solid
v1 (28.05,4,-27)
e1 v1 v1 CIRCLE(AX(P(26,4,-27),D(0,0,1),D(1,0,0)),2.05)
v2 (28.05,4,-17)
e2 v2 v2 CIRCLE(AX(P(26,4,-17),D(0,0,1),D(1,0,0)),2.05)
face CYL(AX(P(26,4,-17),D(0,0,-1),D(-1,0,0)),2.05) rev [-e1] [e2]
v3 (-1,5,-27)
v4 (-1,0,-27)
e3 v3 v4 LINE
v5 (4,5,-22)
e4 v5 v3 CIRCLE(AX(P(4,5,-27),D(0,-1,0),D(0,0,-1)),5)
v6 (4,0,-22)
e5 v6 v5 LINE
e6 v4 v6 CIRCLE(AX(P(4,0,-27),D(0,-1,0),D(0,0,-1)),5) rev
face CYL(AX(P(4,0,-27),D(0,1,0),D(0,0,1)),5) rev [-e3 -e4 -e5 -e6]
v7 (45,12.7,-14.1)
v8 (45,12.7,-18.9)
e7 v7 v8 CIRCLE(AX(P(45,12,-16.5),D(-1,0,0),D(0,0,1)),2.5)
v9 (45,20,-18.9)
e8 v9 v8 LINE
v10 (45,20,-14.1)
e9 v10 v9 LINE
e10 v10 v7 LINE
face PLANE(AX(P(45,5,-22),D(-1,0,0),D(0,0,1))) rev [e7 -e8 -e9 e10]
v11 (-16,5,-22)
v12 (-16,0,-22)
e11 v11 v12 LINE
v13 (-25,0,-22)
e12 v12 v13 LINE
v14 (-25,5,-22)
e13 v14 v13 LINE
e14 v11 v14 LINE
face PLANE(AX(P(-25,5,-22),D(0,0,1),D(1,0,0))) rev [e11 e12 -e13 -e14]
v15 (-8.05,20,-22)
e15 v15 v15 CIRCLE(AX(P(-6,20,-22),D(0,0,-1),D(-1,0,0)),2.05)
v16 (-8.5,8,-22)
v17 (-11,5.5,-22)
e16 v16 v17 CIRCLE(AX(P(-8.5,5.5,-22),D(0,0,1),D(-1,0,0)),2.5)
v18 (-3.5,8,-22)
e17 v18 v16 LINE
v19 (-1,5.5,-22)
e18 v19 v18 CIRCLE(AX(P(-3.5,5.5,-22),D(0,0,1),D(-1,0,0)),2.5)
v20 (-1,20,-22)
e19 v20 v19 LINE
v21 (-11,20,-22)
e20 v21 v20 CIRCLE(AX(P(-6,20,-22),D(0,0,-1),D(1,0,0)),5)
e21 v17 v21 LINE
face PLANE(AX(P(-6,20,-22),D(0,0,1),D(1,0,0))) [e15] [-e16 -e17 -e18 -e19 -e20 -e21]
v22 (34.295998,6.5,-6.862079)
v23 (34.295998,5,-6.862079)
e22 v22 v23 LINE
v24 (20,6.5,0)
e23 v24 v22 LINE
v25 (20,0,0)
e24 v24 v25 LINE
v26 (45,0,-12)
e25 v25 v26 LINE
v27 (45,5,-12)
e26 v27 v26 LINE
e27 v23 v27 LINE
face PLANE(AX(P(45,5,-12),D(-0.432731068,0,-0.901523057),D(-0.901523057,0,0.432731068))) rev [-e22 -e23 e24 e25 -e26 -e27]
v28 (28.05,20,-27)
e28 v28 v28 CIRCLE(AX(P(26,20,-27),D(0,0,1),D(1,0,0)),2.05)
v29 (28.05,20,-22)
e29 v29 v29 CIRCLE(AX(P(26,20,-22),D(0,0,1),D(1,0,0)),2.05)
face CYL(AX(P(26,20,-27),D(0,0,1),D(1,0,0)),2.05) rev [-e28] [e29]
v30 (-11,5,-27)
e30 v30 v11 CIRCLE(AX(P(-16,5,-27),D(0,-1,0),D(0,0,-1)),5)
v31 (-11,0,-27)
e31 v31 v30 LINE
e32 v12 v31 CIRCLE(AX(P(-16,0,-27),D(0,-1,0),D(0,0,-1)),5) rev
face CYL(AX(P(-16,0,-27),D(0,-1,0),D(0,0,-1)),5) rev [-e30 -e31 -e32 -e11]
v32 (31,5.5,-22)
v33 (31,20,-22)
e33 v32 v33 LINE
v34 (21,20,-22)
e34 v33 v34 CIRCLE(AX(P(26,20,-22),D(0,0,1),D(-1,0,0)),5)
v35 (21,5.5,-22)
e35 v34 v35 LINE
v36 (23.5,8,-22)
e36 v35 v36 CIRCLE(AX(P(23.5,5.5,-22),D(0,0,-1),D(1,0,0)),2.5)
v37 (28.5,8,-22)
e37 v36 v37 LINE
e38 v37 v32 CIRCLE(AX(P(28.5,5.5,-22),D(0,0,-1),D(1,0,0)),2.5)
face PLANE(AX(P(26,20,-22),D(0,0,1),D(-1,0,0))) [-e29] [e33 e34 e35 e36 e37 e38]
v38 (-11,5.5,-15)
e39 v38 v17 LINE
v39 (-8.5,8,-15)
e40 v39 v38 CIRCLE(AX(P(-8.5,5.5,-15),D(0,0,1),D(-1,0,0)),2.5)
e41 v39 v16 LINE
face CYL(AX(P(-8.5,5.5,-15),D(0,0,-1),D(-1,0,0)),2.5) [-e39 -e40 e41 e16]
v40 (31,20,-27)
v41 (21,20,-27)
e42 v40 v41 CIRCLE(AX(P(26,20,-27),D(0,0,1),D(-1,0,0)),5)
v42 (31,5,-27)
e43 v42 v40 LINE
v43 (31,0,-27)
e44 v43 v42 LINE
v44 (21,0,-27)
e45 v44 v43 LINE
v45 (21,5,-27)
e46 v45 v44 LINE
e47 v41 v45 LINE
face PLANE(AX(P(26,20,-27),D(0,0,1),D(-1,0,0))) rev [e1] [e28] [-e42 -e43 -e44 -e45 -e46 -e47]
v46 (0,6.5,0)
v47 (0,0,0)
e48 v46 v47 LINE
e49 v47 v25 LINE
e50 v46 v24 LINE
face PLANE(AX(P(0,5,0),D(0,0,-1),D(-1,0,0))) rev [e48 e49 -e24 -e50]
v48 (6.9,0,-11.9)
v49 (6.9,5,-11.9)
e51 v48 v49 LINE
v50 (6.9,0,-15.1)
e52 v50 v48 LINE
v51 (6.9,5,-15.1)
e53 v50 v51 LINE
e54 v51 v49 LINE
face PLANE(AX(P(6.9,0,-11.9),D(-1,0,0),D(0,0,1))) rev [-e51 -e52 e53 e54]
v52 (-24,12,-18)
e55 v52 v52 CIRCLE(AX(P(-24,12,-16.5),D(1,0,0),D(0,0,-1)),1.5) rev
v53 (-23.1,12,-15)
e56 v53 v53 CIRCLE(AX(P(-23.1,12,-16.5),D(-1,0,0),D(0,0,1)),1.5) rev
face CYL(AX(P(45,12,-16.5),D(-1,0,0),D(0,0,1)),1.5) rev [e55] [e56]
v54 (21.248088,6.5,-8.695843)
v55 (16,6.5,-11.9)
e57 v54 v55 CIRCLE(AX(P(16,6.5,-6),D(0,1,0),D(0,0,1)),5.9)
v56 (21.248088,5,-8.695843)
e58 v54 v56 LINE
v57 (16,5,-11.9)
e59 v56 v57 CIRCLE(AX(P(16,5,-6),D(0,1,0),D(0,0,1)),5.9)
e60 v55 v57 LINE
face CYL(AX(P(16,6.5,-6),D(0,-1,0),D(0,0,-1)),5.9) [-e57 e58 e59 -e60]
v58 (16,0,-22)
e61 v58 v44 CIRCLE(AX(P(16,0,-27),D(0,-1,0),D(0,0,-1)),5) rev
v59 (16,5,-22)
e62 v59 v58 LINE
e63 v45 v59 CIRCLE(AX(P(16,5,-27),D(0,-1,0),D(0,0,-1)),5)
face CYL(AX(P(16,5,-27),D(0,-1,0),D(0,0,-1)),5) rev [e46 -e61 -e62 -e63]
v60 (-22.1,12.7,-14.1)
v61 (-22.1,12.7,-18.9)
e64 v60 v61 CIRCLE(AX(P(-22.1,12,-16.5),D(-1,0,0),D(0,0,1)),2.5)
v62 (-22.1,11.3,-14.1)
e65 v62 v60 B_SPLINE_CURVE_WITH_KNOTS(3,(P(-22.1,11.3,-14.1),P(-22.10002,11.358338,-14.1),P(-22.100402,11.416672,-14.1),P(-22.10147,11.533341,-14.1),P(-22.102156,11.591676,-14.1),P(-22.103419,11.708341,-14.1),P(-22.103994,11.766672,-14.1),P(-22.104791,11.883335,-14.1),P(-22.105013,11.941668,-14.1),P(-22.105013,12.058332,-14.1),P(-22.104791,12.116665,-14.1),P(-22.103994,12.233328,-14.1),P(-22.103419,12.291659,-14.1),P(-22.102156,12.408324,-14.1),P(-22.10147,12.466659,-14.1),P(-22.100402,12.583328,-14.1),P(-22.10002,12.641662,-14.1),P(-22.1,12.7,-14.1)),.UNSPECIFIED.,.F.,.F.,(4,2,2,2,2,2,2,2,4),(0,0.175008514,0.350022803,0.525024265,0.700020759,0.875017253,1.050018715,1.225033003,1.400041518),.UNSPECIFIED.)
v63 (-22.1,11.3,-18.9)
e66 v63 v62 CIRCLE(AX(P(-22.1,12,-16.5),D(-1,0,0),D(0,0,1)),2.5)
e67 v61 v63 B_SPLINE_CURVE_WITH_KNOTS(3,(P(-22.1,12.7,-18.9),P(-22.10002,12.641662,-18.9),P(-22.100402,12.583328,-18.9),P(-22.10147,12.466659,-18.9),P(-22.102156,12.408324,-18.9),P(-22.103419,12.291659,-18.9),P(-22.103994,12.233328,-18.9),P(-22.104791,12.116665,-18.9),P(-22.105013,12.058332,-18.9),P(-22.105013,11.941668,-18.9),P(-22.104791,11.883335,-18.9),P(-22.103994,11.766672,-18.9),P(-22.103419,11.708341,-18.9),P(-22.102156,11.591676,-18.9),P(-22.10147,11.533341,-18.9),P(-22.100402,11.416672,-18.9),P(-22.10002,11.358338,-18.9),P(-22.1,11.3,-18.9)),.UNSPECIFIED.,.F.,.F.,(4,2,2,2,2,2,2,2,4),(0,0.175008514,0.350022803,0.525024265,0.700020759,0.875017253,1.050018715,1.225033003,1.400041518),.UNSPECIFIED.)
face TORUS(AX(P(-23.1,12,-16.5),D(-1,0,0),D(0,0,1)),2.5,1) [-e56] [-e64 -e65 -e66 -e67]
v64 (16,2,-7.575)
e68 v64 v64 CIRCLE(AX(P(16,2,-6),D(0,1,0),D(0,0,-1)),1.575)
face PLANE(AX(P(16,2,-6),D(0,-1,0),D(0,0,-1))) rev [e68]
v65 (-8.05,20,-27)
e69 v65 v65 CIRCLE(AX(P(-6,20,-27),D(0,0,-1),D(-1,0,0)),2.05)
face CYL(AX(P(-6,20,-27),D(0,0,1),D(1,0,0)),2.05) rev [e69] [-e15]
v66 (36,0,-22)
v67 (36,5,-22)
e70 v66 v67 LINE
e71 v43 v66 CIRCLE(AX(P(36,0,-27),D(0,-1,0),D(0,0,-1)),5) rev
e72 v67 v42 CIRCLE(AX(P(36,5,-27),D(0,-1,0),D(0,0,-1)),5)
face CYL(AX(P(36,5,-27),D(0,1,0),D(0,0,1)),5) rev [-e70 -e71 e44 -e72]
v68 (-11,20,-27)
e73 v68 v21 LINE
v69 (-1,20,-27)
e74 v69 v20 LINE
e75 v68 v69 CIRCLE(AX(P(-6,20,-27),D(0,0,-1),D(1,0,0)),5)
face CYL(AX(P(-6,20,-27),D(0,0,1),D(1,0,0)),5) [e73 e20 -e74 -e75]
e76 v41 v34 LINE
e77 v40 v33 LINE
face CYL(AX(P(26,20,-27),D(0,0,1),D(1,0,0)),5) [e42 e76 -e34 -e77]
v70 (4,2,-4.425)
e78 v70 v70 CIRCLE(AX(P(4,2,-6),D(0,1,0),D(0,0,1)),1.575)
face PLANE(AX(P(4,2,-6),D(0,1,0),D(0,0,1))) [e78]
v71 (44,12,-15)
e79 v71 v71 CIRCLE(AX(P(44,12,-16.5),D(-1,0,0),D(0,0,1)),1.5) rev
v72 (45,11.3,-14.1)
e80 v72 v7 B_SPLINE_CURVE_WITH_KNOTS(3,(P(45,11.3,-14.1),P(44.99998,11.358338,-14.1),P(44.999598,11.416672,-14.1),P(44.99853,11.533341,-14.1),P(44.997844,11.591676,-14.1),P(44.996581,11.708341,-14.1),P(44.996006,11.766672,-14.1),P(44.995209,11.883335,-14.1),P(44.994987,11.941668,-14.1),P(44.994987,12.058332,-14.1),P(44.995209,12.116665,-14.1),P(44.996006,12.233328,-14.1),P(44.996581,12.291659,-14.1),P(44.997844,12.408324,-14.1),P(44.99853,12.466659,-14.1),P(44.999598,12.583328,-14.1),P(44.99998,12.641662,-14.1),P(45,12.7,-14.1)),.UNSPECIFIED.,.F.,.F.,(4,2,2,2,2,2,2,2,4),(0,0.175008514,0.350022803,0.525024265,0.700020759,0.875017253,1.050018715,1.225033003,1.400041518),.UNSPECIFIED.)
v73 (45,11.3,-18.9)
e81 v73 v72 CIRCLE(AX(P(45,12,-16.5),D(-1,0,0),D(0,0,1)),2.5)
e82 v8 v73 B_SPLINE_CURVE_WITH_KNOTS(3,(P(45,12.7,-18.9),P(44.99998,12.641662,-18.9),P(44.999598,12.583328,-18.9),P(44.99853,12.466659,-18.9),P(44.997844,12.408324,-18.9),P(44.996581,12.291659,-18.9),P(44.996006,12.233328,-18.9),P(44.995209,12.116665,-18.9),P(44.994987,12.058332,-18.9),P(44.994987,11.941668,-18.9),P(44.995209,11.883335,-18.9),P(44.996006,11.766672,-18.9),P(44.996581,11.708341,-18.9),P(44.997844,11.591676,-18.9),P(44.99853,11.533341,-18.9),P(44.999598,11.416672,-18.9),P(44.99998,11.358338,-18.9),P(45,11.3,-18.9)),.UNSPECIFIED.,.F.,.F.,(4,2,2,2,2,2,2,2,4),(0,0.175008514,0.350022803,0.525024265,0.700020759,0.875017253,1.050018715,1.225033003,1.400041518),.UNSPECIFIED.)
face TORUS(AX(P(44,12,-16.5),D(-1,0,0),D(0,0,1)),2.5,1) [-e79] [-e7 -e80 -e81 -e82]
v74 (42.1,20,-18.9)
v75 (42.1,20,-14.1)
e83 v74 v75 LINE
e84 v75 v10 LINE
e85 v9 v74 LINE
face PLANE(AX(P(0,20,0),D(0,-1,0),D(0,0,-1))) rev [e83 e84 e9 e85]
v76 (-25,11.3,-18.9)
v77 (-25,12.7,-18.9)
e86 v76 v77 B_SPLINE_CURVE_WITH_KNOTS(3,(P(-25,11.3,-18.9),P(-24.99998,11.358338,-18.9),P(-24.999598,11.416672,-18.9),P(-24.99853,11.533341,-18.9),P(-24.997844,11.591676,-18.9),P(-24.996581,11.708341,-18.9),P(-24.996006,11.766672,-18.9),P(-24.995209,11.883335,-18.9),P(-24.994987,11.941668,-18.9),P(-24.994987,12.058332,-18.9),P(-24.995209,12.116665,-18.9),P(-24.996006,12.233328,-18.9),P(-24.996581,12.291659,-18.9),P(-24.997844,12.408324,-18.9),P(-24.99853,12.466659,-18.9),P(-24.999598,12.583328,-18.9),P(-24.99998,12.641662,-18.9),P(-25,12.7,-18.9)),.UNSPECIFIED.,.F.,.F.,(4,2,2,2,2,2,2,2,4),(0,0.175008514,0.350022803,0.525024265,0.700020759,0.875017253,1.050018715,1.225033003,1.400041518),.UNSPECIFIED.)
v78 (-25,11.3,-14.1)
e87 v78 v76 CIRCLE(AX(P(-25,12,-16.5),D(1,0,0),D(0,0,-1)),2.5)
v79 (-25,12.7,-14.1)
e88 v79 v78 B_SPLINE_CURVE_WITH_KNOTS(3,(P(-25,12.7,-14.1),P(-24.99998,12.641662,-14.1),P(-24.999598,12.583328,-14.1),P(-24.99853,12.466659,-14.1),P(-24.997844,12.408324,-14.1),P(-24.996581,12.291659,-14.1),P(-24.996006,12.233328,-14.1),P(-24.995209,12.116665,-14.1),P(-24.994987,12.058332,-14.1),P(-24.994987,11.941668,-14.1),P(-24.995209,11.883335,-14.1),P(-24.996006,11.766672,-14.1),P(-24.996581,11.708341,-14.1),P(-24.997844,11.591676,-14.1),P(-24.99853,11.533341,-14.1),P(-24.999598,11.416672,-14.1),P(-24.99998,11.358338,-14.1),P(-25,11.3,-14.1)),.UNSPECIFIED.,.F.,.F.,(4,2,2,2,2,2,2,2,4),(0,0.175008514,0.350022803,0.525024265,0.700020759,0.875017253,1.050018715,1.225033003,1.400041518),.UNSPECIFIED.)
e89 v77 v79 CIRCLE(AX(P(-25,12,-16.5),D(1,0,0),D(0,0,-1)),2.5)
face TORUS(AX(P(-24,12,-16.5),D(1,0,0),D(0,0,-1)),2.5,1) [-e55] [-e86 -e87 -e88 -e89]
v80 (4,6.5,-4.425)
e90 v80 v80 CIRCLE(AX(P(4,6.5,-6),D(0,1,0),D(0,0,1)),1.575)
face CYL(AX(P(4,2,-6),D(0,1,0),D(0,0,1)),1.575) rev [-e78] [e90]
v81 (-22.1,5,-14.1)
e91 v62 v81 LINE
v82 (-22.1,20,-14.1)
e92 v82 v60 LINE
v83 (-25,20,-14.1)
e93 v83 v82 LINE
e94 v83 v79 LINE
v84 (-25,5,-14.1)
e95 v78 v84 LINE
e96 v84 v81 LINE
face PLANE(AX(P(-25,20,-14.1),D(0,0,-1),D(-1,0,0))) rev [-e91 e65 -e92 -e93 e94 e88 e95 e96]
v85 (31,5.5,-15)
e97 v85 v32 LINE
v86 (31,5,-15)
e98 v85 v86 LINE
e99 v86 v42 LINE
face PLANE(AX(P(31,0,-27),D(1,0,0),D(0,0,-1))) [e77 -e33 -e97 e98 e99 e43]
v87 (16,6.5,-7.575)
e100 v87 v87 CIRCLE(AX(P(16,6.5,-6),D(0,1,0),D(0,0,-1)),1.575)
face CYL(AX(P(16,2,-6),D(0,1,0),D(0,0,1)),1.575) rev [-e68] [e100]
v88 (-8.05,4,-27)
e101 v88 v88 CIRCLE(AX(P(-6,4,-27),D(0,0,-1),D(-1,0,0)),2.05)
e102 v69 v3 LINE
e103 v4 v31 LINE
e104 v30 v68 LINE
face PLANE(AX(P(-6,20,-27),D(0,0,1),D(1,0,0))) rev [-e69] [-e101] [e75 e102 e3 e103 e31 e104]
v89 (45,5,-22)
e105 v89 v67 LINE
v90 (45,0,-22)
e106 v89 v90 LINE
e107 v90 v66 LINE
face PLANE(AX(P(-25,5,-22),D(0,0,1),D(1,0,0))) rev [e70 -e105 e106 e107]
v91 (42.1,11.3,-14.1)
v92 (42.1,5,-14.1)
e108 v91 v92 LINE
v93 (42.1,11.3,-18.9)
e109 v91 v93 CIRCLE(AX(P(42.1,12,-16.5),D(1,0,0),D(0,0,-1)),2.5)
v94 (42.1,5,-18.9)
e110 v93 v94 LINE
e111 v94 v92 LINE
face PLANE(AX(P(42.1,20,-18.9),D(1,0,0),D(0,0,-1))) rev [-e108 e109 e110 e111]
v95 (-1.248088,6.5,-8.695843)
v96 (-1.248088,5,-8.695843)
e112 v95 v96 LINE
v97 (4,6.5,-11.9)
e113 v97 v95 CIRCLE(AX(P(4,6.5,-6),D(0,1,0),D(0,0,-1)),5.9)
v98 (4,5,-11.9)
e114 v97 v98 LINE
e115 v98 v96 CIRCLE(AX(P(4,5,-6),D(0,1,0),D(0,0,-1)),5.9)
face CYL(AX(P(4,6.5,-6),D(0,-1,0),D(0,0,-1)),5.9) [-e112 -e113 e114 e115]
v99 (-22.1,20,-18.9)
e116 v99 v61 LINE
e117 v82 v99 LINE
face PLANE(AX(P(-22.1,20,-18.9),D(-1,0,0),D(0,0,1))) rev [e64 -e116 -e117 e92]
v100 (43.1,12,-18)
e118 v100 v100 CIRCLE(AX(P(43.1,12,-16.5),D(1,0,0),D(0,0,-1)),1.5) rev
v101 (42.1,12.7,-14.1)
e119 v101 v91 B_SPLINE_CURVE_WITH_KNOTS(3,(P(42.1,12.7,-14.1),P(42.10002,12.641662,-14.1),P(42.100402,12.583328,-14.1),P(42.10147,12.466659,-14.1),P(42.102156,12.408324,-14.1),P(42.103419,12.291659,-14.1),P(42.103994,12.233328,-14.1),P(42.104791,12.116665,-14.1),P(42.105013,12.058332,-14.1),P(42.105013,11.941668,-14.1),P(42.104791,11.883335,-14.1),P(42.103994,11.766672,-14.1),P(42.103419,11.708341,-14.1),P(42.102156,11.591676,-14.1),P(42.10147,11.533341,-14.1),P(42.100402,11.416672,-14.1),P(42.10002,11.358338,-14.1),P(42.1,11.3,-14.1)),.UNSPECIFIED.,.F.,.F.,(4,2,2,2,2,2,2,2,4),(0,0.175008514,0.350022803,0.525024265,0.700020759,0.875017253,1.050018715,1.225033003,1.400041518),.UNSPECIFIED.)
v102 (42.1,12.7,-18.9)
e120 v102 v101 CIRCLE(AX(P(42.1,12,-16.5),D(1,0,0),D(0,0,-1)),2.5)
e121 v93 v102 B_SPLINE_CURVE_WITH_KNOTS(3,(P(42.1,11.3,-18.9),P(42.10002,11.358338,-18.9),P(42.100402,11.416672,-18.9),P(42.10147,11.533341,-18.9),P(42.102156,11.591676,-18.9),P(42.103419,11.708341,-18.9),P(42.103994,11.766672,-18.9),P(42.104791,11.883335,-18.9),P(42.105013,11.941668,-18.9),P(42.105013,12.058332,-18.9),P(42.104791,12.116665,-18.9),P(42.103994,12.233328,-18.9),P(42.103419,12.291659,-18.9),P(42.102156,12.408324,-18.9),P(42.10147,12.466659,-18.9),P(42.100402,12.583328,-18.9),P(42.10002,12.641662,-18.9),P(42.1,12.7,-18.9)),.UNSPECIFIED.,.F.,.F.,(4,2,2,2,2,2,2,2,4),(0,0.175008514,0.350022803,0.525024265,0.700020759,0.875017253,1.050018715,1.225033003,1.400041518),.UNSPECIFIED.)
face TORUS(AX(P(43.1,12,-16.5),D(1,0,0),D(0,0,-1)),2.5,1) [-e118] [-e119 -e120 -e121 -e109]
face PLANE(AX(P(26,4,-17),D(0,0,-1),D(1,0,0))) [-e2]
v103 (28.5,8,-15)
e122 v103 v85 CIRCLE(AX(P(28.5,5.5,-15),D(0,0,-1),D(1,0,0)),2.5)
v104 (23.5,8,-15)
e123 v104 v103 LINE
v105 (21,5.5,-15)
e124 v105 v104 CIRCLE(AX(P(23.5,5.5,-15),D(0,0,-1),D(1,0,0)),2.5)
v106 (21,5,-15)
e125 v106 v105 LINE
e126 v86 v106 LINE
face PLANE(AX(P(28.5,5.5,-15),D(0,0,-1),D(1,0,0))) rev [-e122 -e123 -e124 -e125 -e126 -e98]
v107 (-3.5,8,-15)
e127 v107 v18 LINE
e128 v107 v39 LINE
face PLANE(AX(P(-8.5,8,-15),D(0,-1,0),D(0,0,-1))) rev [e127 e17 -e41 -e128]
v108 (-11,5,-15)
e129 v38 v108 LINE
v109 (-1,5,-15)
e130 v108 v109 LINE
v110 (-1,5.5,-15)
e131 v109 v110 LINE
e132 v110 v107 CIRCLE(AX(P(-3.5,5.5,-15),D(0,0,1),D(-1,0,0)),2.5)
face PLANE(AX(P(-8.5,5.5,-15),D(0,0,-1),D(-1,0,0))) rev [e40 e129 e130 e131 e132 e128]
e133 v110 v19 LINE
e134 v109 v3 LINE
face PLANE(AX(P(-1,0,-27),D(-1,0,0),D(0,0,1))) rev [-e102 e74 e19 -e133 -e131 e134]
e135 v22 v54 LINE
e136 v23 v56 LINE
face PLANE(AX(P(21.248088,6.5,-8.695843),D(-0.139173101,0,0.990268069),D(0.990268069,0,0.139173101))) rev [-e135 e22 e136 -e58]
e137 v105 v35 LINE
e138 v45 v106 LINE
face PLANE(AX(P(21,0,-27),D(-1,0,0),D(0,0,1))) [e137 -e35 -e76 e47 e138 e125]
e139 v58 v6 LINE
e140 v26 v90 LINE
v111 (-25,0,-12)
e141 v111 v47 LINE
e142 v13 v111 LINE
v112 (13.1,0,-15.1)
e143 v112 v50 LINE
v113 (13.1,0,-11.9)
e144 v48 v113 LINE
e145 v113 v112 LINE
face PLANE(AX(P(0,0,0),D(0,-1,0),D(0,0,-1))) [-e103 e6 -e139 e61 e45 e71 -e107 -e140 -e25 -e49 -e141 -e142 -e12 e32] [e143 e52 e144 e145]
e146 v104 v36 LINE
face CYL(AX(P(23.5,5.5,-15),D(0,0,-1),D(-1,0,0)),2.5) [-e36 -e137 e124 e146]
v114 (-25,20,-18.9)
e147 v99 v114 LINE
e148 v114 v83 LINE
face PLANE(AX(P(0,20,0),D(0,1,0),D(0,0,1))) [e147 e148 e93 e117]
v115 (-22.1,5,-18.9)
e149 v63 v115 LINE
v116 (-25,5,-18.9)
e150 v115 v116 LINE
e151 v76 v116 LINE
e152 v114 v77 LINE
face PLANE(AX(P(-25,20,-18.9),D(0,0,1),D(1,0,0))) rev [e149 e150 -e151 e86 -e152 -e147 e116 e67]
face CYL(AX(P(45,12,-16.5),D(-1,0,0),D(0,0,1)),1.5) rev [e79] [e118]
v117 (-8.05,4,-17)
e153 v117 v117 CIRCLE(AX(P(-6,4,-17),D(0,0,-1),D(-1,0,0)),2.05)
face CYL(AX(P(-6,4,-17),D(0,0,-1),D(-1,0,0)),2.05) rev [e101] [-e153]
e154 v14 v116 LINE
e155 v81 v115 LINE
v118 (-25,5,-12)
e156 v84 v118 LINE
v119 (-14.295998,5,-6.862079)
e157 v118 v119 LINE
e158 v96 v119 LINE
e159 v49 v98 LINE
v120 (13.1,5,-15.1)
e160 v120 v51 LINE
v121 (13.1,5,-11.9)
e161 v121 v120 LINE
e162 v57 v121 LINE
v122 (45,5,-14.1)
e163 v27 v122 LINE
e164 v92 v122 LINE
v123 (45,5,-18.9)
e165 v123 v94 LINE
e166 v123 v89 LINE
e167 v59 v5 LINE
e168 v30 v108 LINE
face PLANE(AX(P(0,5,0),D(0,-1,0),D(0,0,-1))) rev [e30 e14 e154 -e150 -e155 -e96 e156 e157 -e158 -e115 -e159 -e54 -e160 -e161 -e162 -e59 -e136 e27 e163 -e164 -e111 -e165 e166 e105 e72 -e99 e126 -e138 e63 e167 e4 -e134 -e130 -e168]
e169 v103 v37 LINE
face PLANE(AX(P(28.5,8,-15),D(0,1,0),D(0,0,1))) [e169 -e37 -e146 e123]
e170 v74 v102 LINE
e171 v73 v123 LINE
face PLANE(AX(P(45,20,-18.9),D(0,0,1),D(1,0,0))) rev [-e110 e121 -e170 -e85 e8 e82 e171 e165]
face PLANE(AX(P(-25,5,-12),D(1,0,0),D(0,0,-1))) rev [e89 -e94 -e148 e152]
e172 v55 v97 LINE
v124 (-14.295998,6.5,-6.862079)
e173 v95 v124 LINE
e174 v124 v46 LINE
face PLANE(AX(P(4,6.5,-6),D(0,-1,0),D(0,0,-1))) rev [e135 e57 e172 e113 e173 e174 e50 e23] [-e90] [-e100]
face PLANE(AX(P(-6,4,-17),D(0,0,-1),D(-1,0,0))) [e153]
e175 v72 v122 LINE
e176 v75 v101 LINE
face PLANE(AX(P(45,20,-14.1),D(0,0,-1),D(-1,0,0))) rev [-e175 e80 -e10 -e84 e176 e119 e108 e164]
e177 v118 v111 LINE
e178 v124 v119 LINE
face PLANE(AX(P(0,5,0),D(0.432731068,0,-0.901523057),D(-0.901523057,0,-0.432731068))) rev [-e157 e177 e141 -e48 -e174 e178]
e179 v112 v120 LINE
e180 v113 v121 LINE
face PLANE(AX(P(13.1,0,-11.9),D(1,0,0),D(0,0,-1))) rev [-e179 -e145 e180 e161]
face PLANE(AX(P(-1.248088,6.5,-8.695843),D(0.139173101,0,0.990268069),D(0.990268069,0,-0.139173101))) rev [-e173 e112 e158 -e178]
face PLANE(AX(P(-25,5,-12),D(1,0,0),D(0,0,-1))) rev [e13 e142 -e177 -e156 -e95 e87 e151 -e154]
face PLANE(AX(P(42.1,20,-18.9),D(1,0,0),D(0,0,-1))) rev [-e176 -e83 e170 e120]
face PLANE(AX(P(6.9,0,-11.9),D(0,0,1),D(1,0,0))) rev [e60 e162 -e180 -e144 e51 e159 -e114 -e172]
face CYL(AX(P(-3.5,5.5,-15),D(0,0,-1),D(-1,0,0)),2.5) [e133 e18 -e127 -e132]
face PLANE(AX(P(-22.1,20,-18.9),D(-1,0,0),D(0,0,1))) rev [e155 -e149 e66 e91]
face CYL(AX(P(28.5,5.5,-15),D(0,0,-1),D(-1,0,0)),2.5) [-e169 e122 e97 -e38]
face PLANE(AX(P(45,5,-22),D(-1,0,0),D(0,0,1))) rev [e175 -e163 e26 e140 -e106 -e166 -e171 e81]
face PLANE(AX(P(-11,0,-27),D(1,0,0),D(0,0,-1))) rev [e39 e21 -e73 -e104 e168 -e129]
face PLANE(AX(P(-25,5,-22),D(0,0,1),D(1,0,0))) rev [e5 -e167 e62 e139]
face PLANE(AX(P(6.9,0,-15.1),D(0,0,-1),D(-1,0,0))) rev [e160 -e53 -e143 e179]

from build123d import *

# Parameters (mm, degrees)
BOSS_EXTRUDE1_DEPTH = 5
SKETCH2_R           = 1.575
CUT_EXTRUDE1_DEPTH  = 3
SKETCH10_W          = 2.9
SKETCH10_H          = 4.8
BOSS_EXTRUDE2_DEPTH = 15
SKETCH9_W           = 6.2
SKETCH9_H           = 3.2
CUT_EXTRUDE4_DEPTH  = 5
SKETCH11_R          = 1.5
CUT_EXTRUDE5_DEPTH  = 70
FILLET3_R           = 1
FILLET4_R           = 1
FILLET6_R           = 1
FILLET7_R           = 1
SKETCH15_R          = 2.05
BOSS_EXTRUDE6_DEPTH = 5
FILLET8_R           = 5
BOSS_EXTRUDE7_DEPTH = 7
SKETCH16_R          = 2.05
CUT_EXTRUDE6_DEPTH  = 10
BOSS_EXTRUDE8_START = 1.5
SKETCH18_R          = 1.575
BOSS_EXTRUDE8_DEPTH = 1.5


# Read off the part's stored shape, not the designer's step: Mirror1
with BuildPart() as part:
    # Sketch1 → Boss-Extrude1 (new body)
    with BuildSketch(Plane(origin=(0, 0, 0), x_dir=(1, 0, 0), z_dir=(0, 1, 0))):
        Polygon((0, 0), (20, 0), (45, 12), (45, 22), (-25, 22), (-25, 12), align=None)
    extrude(amount=BOSS_EXTRUDE1_DEPTH)

    # Sketch2 → Cut-Extrude1 (cut)
    with BuildSketch(Plane(origin=(0, 5, 0), x_dir=(1, 0, 0), z_dir=(0, 1, 0))):
        with Locations(Location((4, 6, 0), (0, 0, 270))):
            Circle(SKETCH2_R)
        with Locations(Location((16, 6, 0), (0, 0, 90))):
            Circle(SKETCH2_R)
    extrude(amount=-CUT_EXTRUDE1_DEPTH, mode=Mode.SUBTRACT)

    # Sketch10 → Boss-Extrude2 (add)
    with BuildSketch(Plane(origin=(0, 5, 0), x_dir=(1, 0, 0), z_dir=(0, 1, 0))):
        with Locations((-23.55, 16.5)):
            Rectangle(SKETCH10_W, SKETCH10_H)
        with Locations((43.55, 16.5)):
            Rectangle(SKETCH10_W, SKETCH10_H)
    extrude(amount=BOSS_EXTRUDE2_DEPTH)

    # Sketch9 → Cut-Extrude4 (cut)
    with BuildSketch(Plane(origin=(0, 5, 0), x_dir=(1, 0, 0), z_dir=(0, 1, 0))):
        with Locations((10, 13.5)):
            Rectangle(SKETCH9_W, SKETCH9_H)
    extrude(amount=-CUT_EXTRUDE4_DEPTH, mode=Mode.SUBTRACT)

    # Sketch11 → Cut-Extrude5 (cut)
    with BuildSketch(Plane.ZY.offset(25)):
        with Locations((-16.5, 12)):
            Circle(SKETCH11_R)
    extrude(amount=-CUT_EXTRUDE5_DEPTH, mode=Mode.SUBTRACT)

    # Fillet3
    # the kernel refuses this fillet: 1 mm, written as the material it takes off along each edge
    with BuildSketch(Plane(origin=(-25, 12, -16.5), x_dir=(0, 0, 1), z_dir=(0, -1, 0))) as fillet3_piece_1:
        with BuildLine():
            CenterArc((1.5 + FILLET3_R, -FILLET3_R), FILLET3_R, 90, 90)
            Line((1.5, -FILLET3_R), (1.5, 0))
            Line((1.5, 0), (1.5 + FILLET3_R, 0))
        make_face()
    revolve(axis=Axis((-25, 12, -16.5), (-1, 0, 0)), mode=Mode.SUBTRACT)

    # Fillet4
    # the kernel refuses this fillet: 1 mm, written as the material it takes off along each edge
    with BuildSketch(Plane(origin=(-22.1, 12, -16.5), x_dir=(0, 0, 1), z_dir=(0, -1, 0))) as fillet4_piece_1:
        with BuildLine():
            CenterArc((1.5 + FILLET4_R, FILLET4_R), FILLET4_R, 180, 90)
            Line((1.5, FILLET4_R), (1.5, 0))
            Line((1.5, 0), (1.5 + FILLET4_R, 0))
        make_face()
    revolve(axis=Axis((-22.1, 12, -16.5), (-1, 0, 0)), mode=Mode.SUBTRACT)

    # Fillet6
    # the kernel refuses this fillet: 1 mm, written as the material it takes off along each edge
    with BuildSketch(Plane(origin=(42.1, 12, -16.5), x_dir=(0, 0, 1), z_dir=(0, -1, 0))) as fillet6_piece_1:
        with BuildLine():
            CenterArc((1.5 + FILLET6_R, -FILLET6_R), FILLET6_R, 90, 90)
            Line((1.5, -FILLET6_R), (1.5, 0))
            Line((1.5, 0), (1.5 + FILLET6_R, 0))
        make_face()
    revolve(axis=Axis((42.1, 12, -16.5), (-1, 0, 0)), mode=Mode.SUBTRACT)

    # Fillet7
    # the kernel refuses this fillet: 1 mm, written as the material it takes off along each edge
    with BuildSketch(Plane(origin=(45, 12, -16.5), x_dir=(0, 0, 1), z_dir=(0, -1, 0))) as fillet7_piece_1:
        with BuildLine():
            CenterArc((1.5 + FILLET7_R, FILLET7_R), FILLET7_R, 180, 90)
            Line((1.5, FILLET7_R), (1.5, 0))
            Line((1.5, 0), (1.5 + FILLET7_R, 0))
        make_face()
    revolve(axis=Axis((45, 12, -16.5), (-1, 0, 0)), mode=Mode.SUBTRACT)

    # Sketch15 → Boss-Extrude6 (add)
    with BuildSketch(Plane(origin=(0, 0, -22), x_dir=(-1, 0, 0), z_dir=(0, 0, -1))):
        with BuildLine():
            Line((11, 0), (1, 0))
            Line((1, 0), (1, 20))
            ThreePointArc((1, 20), (6, 25), (11, 20))
            Line((11, 20), (11, 0))
        make_face()
        with Locations((6, 20)):
            Circle(SKETCH15_R, mode=Mode.SUBTRACT)
    extrude(amount=BOSS_EXTRUDE6_DEPTH)

    # Fillet8
    # the kernel refuses this fillet: 5 mm, written as the material it adds along each edge
    with BuildSketch(Plane(origin=(-11, 5, -22), x_dir=(-1, 0, 0), z_dir=(0, -1, 0)), Plane(origin=(-1, 0, -22), x_dir=(1, 0, 0), z_dir=(0, 1, 0))) as fillet8_piece_1:
        with BuildLine():
            CenterArc((FILLET8_R, FILLET8_R), FILLET8_R, 180, 90)
            Line((0, FILLET8_R), (0, 0))
            Line((0, 0), (FILLET8_R, 0))
        make_face()
    extrude(amount=5)

    # Sketch17 → Boss-Extrude7 (add)
    with BuildSketch(Plane.XY.offset(-22)):
        with BuildLine():
            Line((-11, 5), (-1, 5))
            Line((-1, 5), (-1, 5.5))
            ThreePointArc((-1, 5.5), (-1.732233047, 7.267766953), (-3.5, 8))
            Line((-3.5, 8), (-8.5, 8))
            ThreePointArc((-8.5, 8), (-10.267766953, 7.267766953), (-11, 5.5))
            Line((-11, 5.5), (-11, 5))
        make_face()
    extrude(amount=BOSS_EXTRUDE7_DEPTH)

    # Sketch16 → Cut-Extrude6 (cut)
    with BuildSketch(Plane(origin=(0, 0, -27), x_dir=(-1, 0, 0), z_dir=(0, 0, -1))):
        with Locations((6, 4)):
            Circle(SKETCH16_R)
    extrude(amount=-CUT_EXTRUDE6_DEPTH, mode=Mode.SUBTRACT)

    # Mirror1
    split(bisect_by=Plane(origin=(10, 0, 0), x_dir=(0, 0, 1), z_dir=(1, 0, 0)), keep=Keep.BOTTOM)

    # Mirror1 2: part across plane


with BuildPart() as part_1:
    add(part.part)
    add(part.part.mirror(Plane(origin=(10, 0, 0), x_dir=(0, 0, 1), z_dir=(1, 0, 0))))

    # Sketch18 → Boss-Extrude8 (add)
    with BuildSketch(Plane(origin=(0, 5, 0), x_dir=(1, 0, 0), z_dir=(0, 1, 0)).offset(BOSS_EXTRUDE8_START)):
        with BuildLine():
            Line((4, 11.9), (16, 11.9))
            ThreePointArc((16, 11.9), (19.074453288, 11.03564663), (21.248088251, 8.695843043))
            Line((21.248088251, 8.695843043), (34.2959978, 6.862078944))
            Line((34.2959978, 6.862078944), (20, 0))
            Line((20, 0), (0, 0))
            Line((0, 0), (-14.2959978, 6.862078944))
            Line((-14.2959978, 6.862078944), (-1.248088251, 8.695843043))
            ThreePointArc((-1.248088251, 8.695843043), (0.925546712, 11.03564663), (4, 11.9))
        make_face()
        with Locations(Location((4, 6, 0), (0, 0, 270))):
            Circle(SKETCH18_R, mode=Mode.SUBTRACT)
        with Locations(Location((16, 6, 0), (0, 0, 90))):
            Circle(SKETCH18_R, mode=Mode.SUBTRACT)
    extrude(amount=-BOSS_EXTRUDE8_DEPTH)


solid = part_1.part
